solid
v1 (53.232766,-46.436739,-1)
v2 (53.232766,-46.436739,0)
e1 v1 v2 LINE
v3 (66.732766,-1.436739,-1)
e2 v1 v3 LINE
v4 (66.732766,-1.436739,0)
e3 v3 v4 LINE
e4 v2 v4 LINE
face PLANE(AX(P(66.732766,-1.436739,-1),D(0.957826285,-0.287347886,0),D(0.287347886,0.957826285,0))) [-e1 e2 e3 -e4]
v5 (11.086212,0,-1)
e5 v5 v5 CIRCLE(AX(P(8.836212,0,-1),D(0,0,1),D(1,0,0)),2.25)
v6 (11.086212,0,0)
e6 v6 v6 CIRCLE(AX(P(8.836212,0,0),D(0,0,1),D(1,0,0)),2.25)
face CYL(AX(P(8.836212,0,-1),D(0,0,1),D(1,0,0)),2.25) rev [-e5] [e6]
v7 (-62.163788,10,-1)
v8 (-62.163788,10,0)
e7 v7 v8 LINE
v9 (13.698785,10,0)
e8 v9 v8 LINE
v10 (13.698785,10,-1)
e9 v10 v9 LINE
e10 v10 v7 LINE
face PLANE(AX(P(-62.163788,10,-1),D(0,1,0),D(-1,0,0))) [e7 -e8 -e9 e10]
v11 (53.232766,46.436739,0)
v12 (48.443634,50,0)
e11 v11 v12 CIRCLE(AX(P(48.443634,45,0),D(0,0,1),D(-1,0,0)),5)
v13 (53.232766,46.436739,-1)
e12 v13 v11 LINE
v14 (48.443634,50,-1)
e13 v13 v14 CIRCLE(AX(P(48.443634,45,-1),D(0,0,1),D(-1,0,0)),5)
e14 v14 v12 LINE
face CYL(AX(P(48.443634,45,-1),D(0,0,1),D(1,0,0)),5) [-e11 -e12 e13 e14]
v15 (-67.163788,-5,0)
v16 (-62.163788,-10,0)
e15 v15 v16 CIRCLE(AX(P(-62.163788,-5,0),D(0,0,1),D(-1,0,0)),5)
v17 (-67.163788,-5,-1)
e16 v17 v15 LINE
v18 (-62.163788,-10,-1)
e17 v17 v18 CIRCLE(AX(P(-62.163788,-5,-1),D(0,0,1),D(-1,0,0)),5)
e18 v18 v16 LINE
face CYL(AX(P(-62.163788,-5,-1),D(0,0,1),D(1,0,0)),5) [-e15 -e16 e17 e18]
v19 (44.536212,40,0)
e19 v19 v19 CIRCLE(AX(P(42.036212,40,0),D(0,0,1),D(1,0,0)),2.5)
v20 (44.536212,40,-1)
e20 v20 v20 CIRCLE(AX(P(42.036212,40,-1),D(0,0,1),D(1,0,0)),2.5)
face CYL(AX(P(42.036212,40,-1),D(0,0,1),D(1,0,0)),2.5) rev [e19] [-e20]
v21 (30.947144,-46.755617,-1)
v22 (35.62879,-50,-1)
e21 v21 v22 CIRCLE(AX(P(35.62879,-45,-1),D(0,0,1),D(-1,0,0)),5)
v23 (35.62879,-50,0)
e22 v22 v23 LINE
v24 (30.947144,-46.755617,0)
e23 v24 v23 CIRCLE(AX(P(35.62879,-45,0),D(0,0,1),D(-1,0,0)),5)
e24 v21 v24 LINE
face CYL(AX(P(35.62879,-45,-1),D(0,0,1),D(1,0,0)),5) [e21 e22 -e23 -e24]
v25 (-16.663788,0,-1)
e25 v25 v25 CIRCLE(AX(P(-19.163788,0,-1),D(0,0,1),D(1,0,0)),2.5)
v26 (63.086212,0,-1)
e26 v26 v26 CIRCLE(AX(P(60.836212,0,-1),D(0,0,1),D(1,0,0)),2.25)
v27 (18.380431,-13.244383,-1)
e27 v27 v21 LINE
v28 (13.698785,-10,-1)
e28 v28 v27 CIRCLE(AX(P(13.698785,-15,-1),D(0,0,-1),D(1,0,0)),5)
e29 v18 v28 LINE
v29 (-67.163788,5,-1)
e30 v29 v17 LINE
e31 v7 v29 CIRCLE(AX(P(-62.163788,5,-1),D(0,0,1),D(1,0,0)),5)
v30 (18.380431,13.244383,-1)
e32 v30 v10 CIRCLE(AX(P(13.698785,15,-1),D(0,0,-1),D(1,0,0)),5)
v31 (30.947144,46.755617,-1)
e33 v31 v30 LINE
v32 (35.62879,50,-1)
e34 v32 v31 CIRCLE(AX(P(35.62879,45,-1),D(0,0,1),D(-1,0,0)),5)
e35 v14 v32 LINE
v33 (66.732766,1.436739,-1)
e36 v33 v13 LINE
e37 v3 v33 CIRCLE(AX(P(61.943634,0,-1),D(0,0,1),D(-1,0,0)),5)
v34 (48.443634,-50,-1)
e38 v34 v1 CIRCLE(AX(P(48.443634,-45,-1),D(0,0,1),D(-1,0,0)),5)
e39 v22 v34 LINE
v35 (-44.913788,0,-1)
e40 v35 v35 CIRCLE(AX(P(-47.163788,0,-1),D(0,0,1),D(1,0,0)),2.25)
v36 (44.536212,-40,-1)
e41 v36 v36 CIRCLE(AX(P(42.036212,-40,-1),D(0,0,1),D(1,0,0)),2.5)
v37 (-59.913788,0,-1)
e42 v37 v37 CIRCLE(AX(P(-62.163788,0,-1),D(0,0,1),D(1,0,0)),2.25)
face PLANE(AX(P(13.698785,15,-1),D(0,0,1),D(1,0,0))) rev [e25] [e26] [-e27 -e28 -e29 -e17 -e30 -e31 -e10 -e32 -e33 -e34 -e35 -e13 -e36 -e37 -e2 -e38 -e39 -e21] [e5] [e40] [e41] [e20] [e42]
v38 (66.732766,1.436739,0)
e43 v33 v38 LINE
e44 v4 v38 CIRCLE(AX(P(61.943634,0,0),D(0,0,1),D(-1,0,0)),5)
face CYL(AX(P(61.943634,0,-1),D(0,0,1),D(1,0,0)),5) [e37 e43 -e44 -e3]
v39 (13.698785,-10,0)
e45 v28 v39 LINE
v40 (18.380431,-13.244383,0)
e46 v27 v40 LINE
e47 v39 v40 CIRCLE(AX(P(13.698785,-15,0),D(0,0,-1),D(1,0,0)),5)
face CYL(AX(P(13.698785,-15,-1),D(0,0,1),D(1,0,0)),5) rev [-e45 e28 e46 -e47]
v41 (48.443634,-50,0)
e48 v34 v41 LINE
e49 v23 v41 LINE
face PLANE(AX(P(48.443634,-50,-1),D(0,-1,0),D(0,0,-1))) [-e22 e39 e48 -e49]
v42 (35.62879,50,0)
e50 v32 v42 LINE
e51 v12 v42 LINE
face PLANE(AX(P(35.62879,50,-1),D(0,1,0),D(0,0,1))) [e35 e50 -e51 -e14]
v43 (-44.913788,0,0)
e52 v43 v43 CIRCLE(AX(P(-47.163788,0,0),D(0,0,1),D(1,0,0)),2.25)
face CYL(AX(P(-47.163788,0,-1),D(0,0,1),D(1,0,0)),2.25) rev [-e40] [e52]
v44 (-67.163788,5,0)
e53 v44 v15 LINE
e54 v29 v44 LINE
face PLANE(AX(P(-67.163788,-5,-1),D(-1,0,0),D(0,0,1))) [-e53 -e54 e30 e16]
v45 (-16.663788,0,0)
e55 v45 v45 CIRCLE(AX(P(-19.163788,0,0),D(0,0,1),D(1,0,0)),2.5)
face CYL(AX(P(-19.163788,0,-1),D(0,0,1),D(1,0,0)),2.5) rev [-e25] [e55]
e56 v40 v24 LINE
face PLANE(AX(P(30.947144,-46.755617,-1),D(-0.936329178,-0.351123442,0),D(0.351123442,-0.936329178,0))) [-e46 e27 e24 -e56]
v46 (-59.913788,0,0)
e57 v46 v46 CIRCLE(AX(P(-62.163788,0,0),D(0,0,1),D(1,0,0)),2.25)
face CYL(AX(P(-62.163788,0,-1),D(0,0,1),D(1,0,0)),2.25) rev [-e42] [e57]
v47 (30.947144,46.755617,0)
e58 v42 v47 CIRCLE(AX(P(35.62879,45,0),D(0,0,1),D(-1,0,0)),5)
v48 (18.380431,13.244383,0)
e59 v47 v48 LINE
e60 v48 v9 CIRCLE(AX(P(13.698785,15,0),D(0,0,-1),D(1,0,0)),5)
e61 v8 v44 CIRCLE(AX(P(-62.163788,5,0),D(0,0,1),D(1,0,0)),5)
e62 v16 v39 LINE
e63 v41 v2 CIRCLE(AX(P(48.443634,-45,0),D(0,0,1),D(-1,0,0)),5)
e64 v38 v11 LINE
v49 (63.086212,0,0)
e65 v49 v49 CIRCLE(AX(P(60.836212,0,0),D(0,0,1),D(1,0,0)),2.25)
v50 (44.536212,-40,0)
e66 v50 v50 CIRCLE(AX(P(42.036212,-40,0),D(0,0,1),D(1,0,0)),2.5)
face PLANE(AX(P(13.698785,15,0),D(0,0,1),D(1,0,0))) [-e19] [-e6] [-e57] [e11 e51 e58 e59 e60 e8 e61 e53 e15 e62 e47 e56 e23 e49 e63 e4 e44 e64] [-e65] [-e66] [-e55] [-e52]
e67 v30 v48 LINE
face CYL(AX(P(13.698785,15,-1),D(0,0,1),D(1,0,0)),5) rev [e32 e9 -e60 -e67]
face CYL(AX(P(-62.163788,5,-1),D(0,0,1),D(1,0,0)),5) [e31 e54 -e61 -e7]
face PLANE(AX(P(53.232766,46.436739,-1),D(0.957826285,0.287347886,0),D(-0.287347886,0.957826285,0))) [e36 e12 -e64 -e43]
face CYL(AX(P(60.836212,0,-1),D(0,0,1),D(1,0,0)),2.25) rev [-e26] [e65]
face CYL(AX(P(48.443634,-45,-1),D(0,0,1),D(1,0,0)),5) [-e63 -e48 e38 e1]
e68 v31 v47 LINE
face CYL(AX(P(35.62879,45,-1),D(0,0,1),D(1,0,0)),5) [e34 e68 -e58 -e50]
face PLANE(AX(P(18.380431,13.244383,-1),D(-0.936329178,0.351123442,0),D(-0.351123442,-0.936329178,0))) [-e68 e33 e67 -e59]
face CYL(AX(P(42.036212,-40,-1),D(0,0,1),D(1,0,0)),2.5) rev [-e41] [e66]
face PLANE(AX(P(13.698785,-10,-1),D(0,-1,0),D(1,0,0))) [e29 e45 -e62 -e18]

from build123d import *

# Parameters (mm, degrees)
SKETCH2_R          = 2.5
SKETCH2_R_2        = 2.25
BASE_FLANGE1_DEPTH = 1


# Sheet-metal steps are written as plain solids
with BuildPart() as part:
    # Sketch2 → Base-Flange1 (new body)
    with BuildSketch(Plane.XY):
        with BuildLine():
            Line((-62.163787728, 10), (13.698785388, 10))
            ThreePointArc((13.698785388, 10), (16.546759576, 10.890371912), (18.380431275, 13.244382792))
            Line((18.380431275, 13.244382792), (30.947144181, 46.755617208))
            ThreePointArc((30.947144181, 46.755617208), (32.78081588, 49.109628088), (35.628790069, 50))
            Line((35.628790069, 50), (48.443634474, 50))
            ThreePointArc((48.443634474, 50), (51.428287122, 49.011464641), (53.2327659, 46.436739428))
            Line((53.2327659, 46.436739428), (66.7327659, 1.436739428))
            ThreePointArc((66.7327659, 1.436739428), (66.943634474, 0), (66.7327659, -1.436739428))
            Line((66.7327659, -1.436739428), (53.2327659, -46.436739428))
            ThreePointArc((53.2327659, -46.436739428), (51.428287122, -49.011464641), (48.443634474, -50))
            Line((48.443634474, -50), (35.628790069, -50))
            ThreePointArc((35.628790069, -50), (32.78081588, -49.109628088), (30.947144181, -46.755617208))
            Line((30.947144181, -46.755617208), (18.380431275, -13.244382792))
            ThreePointArc((18.380431275, -13.244382792), (16.546759576, -10.890371912), (13.698785388, -10))
            Line((13.698785388, -10), (-62.163787728, -10))
            ThreePointArc((-62.163787728, -10), (-65.699321634, -8.535533906), (-67.163787728, -5))
            Line((-67.163787728, -5), (-67.163787728, 5))
            ThreePointArc((-67.163787728, 5), (-65.699321634, 8.535533906), (-62.163787728, 10))
        make_face()
        with Locations((-19.163787728, 0)):
            Circle(SKETCH2_R, mode=Mode.SUBTRACT)
        with Locations((42.036212272, 40)):
            Circle(SKETCH2_R, mode=Mode.SUBTRACT)
        with Locations((42.036212272, -40)):
            Circle(SKETCH2_R, mode=Mode.SUBTRACT)
        with Locations((-62.163787728, 0)):
            Circle(SKETCH2_R_2, mode=Mode.SUBTRACT)
        with Locations((-47.163787728, 0)):
            Circle(SKETCH2_R_2, mode=Mode.SUBTRACT)
        with Locations((8.836212272, 0)):
            Circle(SKETCH2_R_2, mode=Mode.SUBTRACT)
        with Locations((60.836212272, 0)):
            Circle(SKETCH2_R_2, mode=Mode.SUBTRACT)
    extrude(amount=-BASE_FLANGE1_DEPTH)


solid = part.part
